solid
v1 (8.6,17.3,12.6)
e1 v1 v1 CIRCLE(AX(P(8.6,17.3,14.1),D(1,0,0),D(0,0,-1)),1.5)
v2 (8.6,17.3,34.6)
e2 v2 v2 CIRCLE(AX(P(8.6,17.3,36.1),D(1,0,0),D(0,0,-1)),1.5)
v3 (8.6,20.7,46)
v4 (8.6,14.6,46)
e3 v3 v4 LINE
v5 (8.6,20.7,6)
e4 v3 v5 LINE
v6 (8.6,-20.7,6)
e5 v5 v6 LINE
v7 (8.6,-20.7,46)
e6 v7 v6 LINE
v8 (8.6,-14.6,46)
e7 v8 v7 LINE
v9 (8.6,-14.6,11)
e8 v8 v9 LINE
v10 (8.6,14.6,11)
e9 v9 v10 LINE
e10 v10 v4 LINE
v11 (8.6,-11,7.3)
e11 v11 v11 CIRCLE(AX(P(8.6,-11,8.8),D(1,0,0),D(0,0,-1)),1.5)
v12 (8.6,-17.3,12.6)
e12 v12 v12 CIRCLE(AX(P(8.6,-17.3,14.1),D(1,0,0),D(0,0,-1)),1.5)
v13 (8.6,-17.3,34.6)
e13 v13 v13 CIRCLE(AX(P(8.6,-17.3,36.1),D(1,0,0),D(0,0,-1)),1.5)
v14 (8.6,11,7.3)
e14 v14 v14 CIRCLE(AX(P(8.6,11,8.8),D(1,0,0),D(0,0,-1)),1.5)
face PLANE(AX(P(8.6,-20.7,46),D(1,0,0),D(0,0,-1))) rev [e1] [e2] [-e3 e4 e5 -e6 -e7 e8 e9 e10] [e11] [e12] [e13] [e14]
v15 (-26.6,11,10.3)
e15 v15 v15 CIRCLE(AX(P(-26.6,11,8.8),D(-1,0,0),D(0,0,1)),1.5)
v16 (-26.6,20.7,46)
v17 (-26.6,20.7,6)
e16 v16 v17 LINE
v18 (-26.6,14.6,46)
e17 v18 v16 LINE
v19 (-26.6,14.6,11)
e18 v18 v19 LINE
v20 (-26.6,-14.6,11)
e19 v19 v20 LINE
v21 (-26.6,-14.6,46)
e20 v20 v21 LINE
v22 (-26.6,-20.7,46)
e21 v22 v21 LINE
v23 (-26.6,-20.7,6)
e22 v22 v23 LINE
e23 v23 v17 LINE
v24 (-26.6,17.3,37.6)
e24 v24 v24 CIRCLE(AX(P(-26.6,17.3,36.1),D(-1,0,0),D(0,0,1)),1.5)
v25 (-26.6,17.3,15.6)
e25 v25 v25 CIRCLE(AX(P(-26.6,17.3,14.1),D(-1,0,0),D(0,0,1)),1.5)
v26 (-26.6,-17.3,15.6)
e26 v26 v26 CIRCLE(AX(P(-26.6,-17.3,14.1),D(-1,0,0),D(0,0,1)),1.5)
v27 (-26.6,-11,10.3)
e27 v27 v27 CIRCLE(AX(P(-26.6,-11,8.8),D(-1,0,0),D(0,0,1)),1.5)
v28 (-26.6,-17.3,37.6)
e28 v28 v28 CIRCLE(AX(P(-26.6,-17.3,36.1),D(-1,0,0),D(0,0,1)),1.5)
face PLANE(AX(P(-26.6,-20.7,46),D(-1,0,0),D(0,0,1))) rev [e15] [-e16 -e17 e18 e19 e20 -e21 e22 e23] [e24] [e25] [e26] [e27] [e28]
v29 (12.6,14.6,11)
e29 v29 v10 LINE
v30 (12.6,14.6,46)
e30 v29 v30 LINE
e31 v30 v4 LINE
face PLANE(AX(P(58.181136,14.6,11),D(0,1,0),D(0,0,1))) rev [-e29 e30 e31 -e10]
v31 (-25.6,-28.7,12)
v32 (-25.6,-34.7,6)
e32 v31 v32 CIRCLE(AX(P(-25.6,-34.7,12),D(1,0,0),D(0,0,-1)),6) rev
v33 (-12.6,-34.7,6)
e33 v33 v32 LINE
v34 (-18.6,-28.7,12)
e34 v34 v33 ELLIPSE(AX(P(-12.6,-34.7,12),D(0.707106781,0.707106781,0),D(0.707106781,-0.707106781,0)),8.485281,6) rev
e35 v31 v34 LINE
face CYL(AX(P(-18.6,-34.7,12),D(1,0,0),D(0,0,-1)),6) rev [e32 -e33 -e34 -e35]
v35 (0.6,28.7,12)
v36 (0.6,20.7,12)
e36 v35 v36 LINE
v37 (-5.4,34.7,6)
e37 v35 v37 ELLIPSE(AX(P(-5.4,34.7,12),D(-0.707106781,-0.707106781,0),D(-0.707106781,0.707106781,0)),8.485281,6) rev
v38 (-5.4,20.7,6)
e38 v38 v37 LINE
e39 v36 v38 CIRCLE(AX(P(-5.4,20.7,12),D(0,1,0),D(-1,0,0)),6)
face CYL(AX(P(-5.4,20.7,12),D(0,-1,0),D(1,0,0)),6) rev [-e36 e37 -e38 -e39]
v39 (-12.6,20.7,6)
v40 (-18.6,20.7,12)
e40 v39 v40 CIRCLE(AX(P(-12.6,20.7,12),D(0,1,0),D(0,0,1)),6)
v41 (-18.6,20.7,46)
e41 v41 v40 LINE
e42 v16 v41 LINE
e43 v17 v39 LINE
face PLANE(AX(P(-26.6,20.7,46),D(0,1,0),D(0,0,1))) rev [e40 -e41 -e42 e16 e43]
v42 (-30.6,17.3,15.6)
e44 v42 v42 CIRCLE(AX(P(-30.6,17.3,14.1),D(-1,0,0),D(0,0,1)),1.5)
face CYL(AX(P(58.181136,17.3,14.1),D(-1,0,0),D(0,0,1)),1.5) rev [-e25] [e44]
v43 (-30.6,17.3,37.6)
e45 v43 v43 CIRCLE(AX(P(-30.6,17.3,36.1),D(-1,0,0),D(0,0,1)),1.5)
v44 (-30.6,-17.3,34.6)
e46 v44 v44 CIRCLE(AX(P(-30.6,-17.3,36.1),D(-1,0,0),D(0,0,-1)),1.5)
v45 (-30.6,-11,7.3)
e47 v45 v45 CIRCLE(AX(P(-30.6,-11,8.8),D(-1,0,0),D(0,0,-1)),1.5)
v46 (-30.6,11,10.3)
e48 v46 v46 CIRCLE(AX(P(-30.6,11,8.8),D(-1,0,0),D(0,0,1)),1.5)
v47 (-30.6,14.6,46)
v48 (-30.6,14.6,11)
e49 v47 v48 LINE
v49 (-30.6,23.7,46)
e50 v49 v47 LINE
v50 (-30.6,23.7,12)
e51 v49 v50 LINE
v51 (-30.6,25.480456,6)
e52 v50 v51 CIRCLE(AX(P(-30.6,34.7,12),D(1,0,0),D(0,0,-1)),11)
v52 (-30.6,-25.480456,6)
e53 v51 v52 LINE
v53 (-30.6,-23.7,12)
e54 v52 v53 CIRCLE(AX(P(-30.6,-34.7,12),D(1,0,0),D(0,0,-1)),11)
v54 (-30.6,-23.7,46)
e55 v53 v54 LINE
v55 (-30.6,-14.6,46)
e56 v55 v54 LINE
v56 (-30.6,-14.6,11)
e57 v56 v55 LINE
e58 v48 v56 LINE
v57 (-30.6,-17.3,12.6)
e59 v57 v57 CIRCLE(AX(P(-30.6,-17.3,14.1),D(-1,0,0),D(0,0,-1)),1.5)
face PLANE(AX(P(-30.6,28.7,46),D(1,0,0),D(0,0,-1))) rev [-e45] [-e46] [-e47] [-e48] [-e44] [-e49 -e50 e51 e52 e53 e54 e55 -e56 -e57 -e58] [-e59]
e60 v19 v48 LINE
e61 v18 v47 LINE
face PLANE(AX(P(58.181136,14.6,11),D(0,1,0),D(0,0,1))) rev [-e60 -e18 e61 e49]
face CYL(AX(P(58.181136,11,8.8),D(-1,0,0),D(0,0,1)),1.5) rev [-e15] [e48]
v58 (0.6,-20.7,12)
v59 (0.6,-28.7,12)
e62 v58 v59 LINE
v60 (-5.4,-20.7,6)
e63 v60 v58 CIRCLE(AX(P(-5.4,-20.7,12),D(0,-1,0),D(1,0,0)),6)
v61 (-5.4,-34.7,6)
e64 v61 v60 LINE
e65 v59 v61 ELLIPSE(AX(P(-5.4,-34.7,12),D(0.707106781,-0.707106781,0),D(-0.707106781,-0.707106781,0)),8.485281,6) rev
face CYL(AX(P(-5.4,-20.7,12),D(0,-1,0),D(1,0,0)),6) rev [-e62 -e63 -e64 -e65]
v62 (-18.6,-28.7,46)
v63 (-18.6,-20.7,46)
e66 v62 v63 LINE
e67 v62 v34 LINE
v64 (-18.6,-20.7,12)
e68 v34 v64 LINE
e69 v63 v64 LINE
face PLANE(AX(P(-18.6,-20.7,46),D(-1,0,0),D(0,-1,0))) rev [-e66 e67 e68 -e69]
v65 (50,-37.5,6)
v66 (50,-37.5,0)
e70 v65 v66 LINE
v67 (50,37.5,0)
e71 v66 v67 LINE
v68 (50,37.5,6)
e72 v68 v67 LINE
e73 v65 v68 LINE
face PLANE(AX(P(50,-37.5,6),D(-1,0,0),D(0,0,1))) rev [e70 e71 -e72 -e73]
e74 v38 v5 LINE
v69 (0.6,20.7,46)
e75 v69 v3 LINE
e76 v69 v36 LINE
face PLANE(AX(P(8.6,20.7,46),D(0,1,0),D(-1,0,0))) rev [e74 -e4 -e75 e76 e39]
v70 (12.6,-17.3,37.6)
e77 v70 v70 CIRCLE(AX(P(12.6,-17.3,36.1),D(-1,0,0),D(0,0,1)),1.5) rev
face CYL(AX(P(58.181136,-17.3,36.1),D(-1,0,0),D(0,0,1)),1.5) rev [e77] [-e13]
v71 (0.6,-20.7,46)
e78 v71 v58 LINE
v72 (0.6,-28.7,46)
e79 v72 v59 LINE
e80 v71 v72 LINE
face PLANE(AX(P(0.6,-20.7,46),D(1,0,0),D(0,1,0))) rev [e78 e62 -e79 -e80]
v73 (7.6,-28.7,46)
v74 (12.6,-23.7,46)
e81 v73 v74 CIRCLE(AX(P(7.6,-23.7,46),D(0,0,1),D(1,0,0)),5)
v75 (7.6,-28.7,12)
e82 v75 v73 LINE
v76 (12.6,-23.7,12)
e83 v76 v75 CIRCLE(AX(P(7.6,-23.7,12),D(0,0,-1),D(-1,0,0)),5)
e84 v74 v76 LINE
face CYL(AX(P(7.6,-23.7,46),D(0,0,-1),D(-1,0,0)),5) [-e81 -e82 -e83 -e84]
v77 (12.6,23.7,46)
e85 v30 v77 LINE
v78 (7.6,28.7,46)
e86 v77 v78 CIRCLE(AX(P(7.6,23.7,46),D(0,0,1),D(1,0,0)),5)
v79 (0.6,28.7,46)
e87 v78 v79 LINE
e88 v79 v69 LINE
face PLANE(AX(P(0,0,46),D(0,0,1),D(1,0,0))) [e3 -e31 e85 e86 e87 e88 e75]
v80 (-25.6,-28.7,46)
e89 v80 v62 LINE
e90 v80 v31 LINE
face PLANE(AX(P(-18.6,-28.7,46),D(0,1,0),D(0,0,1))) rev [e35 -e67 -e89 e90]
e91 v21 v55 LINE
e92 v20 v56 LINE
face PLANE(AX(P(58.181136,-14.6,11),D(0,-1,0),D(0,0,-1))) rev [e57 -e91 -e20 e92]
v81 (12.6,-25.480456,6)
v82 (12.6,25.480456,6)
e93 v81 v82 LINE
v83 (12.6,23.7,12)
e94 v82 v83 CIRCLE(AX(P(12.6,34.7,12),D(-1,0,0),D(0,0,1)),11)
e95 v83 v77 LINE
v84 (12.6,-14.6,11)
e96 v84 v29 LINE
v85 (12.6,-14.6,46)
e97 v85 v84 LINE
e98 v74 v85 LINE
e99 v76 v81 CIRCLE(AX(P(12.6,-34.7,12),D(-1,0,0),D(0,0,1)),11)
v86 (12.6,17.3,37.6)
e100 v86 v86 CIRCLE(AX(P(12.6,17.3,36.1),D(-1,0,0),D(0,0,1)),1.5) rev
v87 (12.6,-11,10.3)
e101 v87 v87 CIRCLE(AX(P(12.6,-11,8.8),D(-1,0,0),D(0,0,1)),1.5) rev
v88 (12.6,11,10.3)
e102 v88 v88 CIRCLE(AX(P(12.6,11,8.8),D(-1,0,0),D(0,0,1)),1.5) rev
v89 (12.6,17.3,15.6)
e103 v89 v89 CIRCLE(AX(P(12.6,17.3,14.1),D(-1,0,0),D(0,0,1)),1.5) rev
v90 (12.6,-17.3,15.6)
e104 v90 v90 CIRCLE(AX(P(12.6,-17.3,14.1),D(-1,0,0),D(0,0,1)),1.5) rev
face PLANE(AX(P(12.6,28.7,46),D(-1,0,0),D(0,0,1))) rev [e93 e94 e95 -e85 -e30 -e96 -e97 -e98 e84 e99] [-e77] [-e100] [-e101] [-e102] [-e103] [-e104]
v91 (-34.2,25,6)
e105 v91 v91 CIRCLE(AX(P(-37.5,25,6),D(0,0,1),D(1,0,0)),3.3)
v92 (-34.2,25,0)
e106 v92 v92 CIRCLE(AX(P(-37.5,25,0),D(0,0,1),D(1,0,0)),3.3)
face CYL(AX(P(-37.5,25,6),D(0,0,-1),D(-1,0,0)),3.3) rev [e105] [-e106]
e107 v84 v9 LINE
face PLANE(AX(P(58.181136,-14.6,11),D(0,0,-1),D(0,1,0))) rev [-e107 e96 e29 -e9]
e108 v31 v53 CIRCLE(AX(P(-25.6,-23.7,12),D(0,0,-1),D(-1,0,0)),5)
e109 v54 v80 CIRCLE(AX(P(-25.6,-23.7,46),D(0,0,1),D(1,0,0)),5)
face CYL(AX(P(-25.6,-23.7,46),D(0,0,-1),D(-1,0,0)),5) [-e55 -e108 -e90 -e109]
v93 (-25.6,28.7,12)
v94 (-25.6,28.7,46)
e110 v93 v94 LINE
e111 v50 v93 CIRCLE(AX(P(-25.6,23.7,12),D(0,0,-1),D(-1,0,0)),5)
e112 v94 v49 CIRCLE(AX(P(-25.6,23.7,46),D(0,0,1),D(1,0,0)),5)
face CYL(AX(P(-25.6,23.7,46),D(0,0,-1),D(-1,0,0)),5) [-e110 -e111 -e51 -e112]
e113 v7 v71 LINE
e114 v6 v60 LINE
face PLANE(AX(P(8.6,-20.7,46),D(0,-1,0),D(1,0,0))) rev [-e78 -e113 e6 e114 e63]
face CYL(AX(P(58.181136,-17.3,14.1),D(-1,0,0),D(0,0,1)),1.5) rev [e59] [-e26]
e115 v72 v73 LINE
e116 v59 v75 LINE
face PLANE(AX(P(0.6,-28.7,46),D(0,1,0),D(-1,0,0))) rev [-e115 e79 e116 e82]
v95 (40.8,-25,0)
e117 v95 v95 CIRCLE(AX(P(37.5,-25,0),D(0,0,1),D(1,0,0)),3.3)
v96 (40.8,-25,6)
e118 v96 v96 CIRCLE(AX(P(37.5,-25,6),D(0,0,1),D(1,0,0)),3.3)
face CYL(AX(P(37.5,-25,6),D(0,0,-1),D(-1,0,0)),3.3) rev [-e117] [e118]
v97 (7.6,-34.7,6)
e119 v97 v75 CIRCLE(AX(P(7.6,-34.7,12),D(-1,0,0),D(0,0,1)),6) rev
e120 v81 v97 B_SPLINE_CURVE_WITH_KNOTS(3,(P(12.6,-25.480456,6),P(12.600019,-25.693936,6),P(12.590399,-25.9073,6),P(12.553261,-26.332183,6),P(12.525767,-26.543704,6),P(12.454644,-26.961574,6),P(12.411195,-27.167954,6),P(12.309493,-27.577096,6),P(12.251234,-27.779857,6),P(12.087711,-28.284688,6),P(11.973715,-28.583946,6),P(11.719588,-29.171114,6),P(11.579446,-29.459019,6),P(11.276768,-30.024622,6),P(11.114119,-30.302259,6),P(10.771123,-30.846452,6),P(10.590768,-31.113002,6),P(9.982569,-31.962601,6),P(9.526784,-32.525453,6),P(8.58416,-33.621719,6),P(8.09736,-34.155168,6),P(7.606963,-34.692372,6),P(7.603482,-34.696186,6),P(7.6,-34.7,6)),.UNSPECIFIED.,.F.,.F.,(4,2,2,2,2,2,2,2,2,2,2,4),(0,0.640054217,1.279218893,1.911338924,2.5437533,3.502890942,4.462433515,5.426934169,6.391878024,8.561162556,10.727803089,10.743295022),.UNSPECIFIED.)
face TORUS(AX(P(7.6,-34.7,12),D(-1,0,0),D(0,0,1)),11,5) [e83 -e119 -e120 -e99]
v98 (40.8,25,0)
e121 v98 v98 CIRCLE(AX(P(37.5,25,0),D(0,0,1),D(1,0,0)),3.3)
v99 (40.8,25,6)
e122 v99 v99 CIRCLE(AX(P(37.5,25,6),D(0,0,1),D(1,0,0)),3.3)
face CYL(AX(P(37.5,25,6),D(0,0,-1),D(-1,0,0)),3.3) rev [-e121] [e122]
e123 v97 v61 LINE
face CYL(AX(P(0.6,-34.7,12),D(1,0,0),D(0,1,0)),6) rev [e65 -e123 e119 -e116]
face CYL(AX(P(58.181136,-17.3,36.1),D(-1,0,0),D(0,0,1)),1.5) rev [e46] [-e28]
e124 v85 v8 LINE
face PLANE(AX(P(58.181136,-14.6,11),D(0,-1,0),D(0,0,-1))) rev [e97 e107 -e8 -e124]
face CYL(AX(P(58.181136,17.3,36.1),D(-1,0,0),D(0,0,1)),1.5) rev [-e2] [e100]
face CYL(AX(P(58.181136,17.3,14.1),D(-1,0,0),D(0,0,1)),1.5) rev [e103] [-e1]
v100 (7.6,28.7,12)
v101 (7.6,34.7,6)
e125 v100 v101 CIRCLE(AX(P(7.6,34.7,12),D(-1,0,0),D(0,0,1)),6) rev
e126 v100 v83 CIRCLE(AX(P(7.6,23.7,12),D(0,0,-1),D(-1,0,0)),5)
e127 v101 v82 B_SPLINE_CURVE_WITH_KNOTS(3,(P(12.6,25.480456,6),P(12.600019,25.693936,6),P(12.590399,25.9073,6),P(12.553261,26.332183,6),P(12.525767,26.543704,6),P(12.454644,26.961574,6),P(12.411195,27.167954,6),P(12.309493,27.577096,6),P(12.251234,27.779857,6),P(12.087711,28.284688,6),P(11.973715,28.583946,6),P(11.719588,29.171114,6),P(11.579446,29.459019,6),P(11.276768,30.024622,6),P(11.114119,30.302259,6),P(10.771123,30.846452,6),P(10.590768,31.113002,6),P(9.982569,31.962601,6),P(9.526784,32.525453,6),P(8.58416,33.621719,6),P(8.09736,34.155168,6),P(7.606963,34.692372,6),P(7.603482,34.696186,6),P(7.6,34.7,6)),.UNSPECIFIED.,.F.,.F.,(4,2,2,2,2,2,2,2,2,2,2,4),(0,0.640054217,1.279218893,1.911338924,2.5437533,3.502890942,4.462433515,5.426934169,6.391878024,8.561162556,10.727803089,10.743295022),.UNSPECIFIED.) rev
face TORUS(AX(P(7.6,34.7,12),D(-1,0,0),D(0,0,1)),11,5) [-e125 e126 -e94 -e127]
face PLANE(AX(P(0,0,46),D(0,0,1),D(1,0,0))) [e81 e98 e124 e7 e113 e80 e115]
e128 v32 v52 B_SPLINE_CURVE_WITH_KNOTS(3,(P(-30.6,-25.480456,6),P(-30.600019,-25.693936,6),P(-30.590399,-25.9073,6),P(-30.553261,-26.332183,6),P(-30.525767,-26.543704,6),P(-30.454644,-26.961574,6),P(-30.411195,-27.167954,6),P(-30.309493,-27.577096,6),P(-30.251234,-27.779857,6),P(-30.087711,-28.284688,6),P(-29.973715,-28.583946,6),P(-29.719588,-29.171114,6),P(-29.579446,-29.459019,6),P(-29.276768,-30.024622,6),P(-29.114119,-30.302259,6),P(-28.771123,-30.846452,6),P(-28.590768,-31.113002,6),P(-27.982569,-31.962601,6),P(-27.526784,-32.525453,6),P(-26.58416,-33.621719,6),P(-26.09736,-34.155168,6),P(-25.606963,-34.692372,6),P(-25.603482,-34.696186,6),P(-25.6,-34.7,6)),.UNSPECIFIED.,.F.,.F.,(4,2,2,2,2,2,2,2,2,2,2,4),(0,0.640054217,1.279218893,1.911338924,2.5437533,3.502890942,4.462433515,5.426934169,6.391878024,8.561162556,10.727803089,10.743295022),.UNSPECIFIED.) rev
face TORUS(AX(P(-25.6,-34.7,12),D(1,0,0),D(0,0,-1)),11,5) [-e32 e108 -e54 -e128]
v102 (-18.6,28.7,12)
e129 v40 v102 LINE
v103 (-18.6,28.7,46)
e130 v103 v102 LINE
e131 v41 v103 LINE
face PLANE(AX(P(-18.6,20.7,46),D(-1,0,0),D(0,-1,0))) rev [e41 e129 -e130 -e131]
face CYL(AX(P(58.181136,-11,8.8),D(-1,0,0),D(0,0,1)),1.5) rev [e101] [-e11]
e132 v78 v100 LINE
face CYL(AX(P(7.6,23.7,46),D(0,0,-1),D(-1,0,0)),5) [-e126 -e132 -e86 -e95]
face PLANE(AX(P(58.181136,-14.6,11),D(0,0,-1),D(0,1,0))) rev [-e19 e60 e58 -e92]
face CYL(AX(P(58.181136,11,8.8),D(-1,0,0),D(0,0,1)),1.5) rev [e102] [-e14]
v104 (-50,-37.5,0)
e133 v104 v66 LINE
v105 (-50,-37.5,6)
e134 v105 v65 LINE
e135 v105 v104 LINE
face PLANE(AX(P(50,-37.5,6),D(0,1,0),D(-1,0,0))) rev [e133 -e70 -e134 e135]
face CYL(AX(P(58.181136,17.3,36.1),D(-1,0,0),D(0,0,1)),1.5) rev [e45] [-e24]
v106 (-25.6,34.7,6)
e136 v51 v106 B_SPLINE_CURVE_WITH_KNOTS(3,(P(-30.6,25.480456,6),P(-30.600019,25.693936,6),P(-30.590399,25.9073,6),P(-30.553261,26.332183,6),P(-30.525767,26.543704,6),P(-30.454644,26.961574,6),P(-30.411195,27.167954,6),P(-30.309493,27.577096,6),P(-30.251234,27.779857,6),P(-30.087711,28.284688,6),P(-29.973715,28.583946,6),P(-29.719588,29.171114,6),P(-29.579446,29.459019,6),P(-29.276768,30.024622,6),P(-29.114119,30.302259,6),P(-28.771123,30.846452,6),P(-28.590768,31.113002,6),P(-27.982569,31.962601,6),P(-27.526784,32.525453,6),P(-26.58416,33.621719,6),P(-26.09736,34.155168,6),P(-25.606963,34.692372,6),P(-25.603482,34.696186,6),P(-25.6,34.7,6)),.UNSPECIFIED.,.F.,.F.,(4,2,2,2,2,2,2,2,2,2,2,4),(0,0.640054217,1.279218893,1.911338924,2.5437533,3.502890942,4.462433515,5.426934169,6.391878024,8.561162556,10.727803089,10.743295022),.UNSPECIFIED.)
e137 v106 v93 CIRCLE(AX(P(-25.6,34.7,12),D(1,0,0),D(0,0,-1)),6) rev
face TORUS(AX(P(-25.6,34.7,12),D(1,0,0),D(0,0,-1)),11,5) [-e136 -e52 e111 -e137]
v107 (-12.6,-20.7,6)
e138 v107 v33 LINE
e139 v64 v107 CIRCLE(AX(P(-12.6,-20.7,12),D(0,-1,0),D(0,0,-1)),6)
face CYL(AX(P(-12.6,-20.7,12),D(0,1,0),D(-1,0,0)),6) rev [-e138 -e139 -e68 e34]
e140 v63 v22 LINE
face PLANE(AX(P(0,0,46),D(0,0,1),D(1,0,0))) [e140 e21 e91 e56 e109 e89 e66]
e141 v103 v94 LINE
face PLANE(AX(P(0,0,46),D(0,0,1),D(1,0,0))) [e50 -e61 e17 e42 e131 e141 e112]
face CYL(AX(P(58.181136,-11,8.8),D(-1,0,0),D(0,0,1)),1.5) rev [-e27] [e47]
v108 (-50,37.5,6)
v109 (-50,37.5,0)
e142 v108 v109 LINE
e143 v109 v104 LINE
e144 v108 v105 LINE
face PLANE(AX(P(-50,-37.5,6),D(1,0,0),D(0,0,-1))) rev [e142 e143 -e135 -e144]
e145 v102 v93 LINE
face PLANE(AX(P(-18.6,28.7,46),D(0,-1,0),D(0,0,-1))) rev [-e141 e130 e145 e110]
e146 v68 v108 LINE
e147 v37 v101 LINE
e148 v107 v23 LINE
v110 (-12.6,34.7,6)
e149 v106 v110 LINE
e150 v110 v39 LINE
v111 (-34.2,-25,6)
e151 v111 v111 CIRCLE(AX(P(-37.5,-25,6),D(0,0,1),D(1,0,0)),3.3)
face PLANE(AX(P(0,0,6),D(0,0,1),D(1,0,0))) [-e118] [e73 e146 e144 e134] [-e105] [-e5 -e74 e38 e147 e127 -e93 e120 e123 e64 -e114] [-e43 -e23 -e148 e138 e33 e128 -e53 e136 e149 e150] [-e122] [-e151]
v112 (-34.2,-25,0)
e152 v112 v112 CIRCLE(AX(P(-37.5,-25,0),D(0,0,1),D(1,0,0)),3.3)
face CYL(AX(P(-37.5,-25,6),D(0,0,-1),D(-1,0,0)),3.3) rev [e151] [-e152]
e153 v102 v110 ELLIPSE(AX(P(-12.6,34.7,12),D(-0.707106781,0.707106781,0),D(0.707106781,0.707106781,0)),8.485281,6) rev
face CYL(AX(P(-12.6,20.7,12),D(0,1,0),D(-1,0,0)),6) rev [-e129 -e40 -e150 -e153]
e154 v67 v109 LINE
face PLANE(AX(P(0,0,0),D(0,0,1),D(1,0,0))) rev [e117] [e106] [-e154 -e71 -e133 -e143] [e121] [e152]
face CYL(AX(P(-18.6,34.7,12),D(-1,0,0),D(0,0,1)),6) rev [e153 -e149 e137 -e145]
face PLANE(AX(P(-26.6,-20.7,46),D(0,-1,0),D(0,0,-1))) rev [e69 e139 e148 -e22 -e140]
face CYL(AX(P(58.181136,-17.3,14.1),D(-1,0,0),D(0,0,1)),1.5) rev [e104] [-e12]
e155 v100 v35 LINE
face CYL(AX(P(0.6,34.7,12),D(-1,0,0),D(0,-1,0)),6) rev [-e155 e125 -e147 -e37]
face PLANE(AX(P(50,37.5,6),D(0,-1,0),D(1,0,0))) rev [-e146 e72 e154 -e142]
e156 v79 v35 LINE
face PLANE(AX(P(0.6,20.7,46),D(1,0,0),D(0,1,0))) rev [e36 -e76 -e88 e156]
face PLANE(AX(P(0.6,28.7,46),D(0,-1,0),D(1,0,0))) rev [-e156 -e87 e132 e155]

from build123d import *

# Parameters (mm, degrees)
SKETCH_1_W          = 100
SKETCH_1_H          = 75
SKETCH_1_R          = 3.3
EXTRUDE_1_DEPTH     = 6
EXTRUDE_2_DEPTH     = 40
CUT_EXTRUDE_1_REACH = 102.093
SKETCH_3_R          = 1.5
SKETCH_3_W          = 35
SKETCH_3_H          = 29.2
FILLET_1_R          = 6
FILLET_2_R          = 5


with BuildPart() as part:
    # 스케치1 → 보스-돌출1 (new body)
    with BuildSketch(Plane.XY):
        Rectangle(SKETCH_1_W, SKETCH_1_H)
        with Locations((-37.5, 25)):
            Circle(SKETCH_1_R, mode=Mode.SUBTRACT)
        with Locations((37.5, 25)):
            Circle(SKETCH_1_R, mode=Mode.SUBTRACT)
        with Locations((37.5, -25)):
            Circle(SKETCH_1_R, mode=Mode.SUBTRACT)
        with Locations((-37.5, -25)):
            Circle(SKETCH_1_R, mode=Mode.SUBTRACT)
    extrude(amount=EXTRUDE_1_DEPTH)

    # 스케치2 → 보스-돌출2 (add)
    with BuildSketch(Plane.XY.offset(6)):
        Polygon((-18.6, 20.7), (-18.6, 28.7), (-30.6, 28.7), (-30.6, -28.7), (-18.6, -28.7), (-18.6, -20.7), (-26.6, -20.7), (-26.6, 20.7), align=None)
        Polygon((8.6, -20.7), (0.6, -20.7), (0.6, -28.7), (12.6, -28.7), (12.6, 28.7), (0.6, 28.7), (0.6, 20.7), (8.6, 20.7), align=None)
    extrude(amount=EXTRUDE_2_DEPTH)

    # 컷-돌출1: up to this face of the body (flat: up to its plane)
    cut_extrude_1_end = Plane(part.part.faces().sort_by_distance((12.6, 0, 26))[0])
    # 스케치3 → 컷-돌출1 (cut, up to the picked face)
    with BuildSketch(Plane.ZY.offset(30.6), mode=Mode.PRIVATE) as cut_extrude_1_sk1:
        with Locations((8.8, 11)):
            Circle(SKETCH_3_R)
    cut_extrude_1_tool1 = split(extrude(cut_extrude_1_sk1.sketch, amount=-CUT_EXTRUDE_1_REACH, mode=Mode.PRIVATE), bisect_by=cut_extrude_1_end, keep=Keep.BOTH, mode=Mode.PRIVATE)
    # 스케치3 → 컷-돌출1 (cut, up to the picked face)
    with BuildSketch(Plane.ZY.offset(30.6), mode=Mode.PRIVATE) as cut_extrude_1_sk2:
        with Locations((14.1, 17.3)):
            Circle(SKETCH_3_R)
    cut_extrude_1_tool2 = split(extrude(cut_extrude_1_sk2.sketch, amount=-CUT_EXTRUDE_1_REACH, mode=Mode.PRIVATE), bisect_by=cut_extrude_1_end, keep=Keep.BOTH, mode=Mode.PRIVATE)
    # 스케치3 → 컷-돌출1 (cut, up to the picked face)
    with BuildSketch(Plane.ZY.offset(30.6), mode=Mode.PRIVATE) as cut_extrude_1_sk3:
        with Locations((36.1, 17.3)):
            Circle(SKETCH_3_R)
    cut_extrude_1_tool3 = split(extrude(cut_extrude_1_sk3.sketch, amount=-CUT_EXTRUDE_1_REACH, mode=Mode.PRIVATE), bisect_by=cut_extrude_1_end, keep=Keep.BOTH, mode=Mode.PRIVATE)
    # 스케치3 → 컷-돌출1 (cut, up to the picked face)
    with BuildSketch(Plane.ZY.offset(30.6), mode=Mode.PRIVATE) as cut_extrude_1_sk4:
        with Locations((8.8, -11)):
            Circle(SKETCH_3_R)
    cut_extrude_1_tool4 = split(extrude(cut_extrude_1_sk4.sketch, amount=-CUT_EXTRUDE_1_REACH, mode=Mode.PRIVATE), bisect_by=cut_extrude_1_end, keep=Keep.BOTH, mode=Mode.PRIVATE)
    # 스케치3 → 컷-돌출1 (cut, up to the picked face)
    with BuildSketch(Plane.ZY.offset(30.6), mode=Mode.PRIVATE) as cut_extrude_1_sk5:
        with Locations((14.1, -17.3)):
            Circle(SKETCH_3_R)
    cut_extrude_1_tool5 = split(extrude(cut_extrude_1_sk5.sketch, amount=-CUT_EXTRUDE_1_REACH, mode=Mode.PRIVATE), bisect_by=cut_extrude_1_end, keep=Keep.BOTH, mode=Mode.PRIVATE)
    # 스케치3 → 컷-돌출1 (cut, up to the picked face)
    with BuildSketch(Plane.ZY.offset(30.6), mode=Mode.PRIVATE) as cut_extrude_1_sk6:
        with Locations((36.1, -17.3)):
            Circle(SKETCH_3_R)
    cut_extrude_1_tool6 = split(extrude(cut_extrude_1_sk6.sketch, amount=-CUT_EXTRUDE_1_REACH, mode=Mode.PRIVATE), bisect_by=cut_extrude_1_end, keep=Keep.BOTH, mode=Mode.PRIVATE)
    # 스케치3 → 컷-돌출1 (cut, up to the picked face)
    with BuildSketch(Plane.ZY.offset(30.6), mode=Mode.PRIVATE) as cut_extrude_1_sk7:
        with Locations((28.5, 0)):
            Rectangle(SKETCH_3_W, SKETCH_3_H)
    cut_extrude_1_tool7 = split(extrude(cut_extrude_1_sk7.sketch, amount=-CUT_EXTRUDE_1_REACH, mode=Mode.PRIVATE), bisect_by=cut_extrude_1_end, keep=Keep.BOTH, mode=Mode.PRIVATE)
    add(cut_extrude_1_tool1.solids().sort_by(Axis((-30.6, 11, 8.8), (1, 0, 0)))[0], mode=Mode.SUBTRACT)
    add(cut_extrude_1_tool2.solids().sort_by(Axis((-30.6, 17.3, 14.1), (1, 0, 0)))[0], mode=Mode.SUBTRACT)
    add(cut_extrude_1_tool3.solids().sort_by(Axis((-30.6, 17.3, 36.1), (1, 0, 0)))[0], mode=Mode.SUBTRACT)
    add(cut_extrude_1_tool4.solids().sort_by(Axis((-30.6, -11, 8.8), (1, 0, 0)))[0], mode=Mode.SUBTRACT)
    add(cut_extrude_1_tool5.solids().sort_by(Axis((-30.6, -17.3, 14.1), (1, 0, 0)))[0], mode=Mode.SUBTRACT)
    add(cut_extrude_1_tool6.solids().sort_by(Axis((-30.6, -17.3, 36.1), (1, 0, 0)))[0], mode=Mode.SUBTRACT)
    add(cut_extrude_1_tool7.solids().sort_by(Axis((-30.6, 0, 28.5), (1, 0, 0)))[0], mode=Mode.SUBTRACT)

    # 필렛1
    fillet_1_edges = [part.edges().sort_by_distance(p)[0] for p in [
        (-18.6, 24.7, 6),
        (-24.6, 28.7, 6),
        (-24.6, -28.7, 6),
        (-18.6, -24.7, 6),
        (0.6, -24.7, 6),
        (6.6, -28.7, 6),
        (6.6, 28.7, 6),
        (0.6, 24.7, 6),
    ]]
    fillet(fillet_1_edges, radius=FILLET_1_R)

    # 필렛2
    # the kernel refuses this fillet: 5 mm, written as the material it takes off along each edge
    with BuildSketch(Plane(origin=(-30.6, 34.7, 12), x_dir=(0, 0.8710924829717933, 0.49111901420127907), z_dir=(0, -0.49111901420127907, 0.8710924829717933))) as fillet_2_piece_1_section:
        with BuildLine():
            CenterArc((6 + FILLET_2_R, -FILLET_2_R), FILLET_2_R, 90, 90)
            Line((6, -FILLET_2_R), (6, 0))
            Line((6, 0), (6 + FILLET_2_R, 0))
        make_face()
    fillet_2_piece_1 = revolve(axis=Axis((-30.6, 34.7, 12), (-1, 0, 0)), revolution_arc=209.414157698, mode=Mode.PRIVATE)
    fillet_2_piece_1 = split(fillet_2_piece_1, bisect_by=Plane(origin=(-29.099532235, 30.223820848, 6), z_dir=(0, 0, 1)), keep=Keep.TOP, mode=Mode.PRIVATE)
    add(fillet_2_piece_1, mode=Mode.SUBTRACT)
    with BuildSketch(Plane(origin=(12.6, 34.7, 12), x_dir=(0, 0.8710924829717934, 0.4911190142012785), z_dir=(0, -0.4911190142012785, 0.8710924829717934))) as fillet_2_piece_2_section:
        with BuildLine():
            CenterArc((6 + FILLET_2_R, FILLET_2_R), FILLET_2_R, 180, 90)
            Line((6 + FILLET_2_R, 0), (6, 0))
            Line((6, 0), (6, FILLET_2_R))
        make_face()
    fillet_2_piece_2 = revolve(axis=Axis((12.6, 34.7, 12), (-1, 0, 0)), revolution_arc=209.414157698, mode=Mode.PRIVATE)
    fillet_2_piece_2 = split(fillet_2_piece_2, bisect_by=Plane(origin=(11.099532075, 30.223821009, 6), z_dir=(0, 0, 1)), keep=Keep.TOP, mode=Mode.PRIVATE)
    add(fillet_2_piece_2, mode=Mode.SUBTRACT)
    with BuildSketch(Plane(origin=(12.6, -34.7, 12), x_dir=(0, -0.8710924829717933, 0.49111901420127907), z_dir=(0, 0.49111901420127907, 0.8710924829717933))) as fillet_2_piece_3_section:
        with BuildLine():
            CenterArc((6 + FILLET_2_R, -FILLET_2_R), FILLET_2_R, 90, 90)
            Line((6, -FILLET_2_R), (6, 0))
            Line((6, 0), (6 + FILLET_2_R, 0))
        make_face()
    fillet_2_piece_3 = revolve(axis=Axis((12.6, -34.7, 12), (1, 0, 0)), revolution_arc=209.414157698, mode=Mode.PRIVATE)
    fillet_2_piece_3 = split(fillet_2_piece_3, bisect_by=Plane(origin=(11.099532513, -30.223820921, 6), z_dir=(0, 0, 1)), keep=Keep.TOP, mode=Mode.PRIVATE)
    add(fillet_2_piece_3, mode=Mode.SUBTRACT)
    with BuildSketch(Plane(origin=(-30.6, -34.7, 12), x_dir=(0, -0.8710924829717931, 0.4911190142012795), z_dir=(0, 0.4911190142012795, 0.8710924829717931))) as fillet_2_piece_4_section:
        with BuildLine():
            CenterArc((6 + FILLET_2_R, FILLET_2_R), FILLET_2_R, 180, 90)
            Line((6 + FILLET_2_R, 0), (6, 0))
            Line((6, 0), (6, FILLET_2_R))
        make_face()
    fillet_2_piece_4 = revolve(axis=Axis((-30.6, -34.7, 12), (1, 0, 0)), revolution_arc=209.414157698, mode=Mode.PRIVATE)
    fillet_2_piece_4 = split(fillet_2_piece_4, bisect_by=Plane(origin=(-29.099532146, -30.223820899, 6), z_dir=(0, 0, 1)), keep=Keep.TOP, mode=Mode.PRIVATE)
    add(fillet_2_piece_4, mode=Mode.SUBTRACT)
    with BuildSketch(Plane(origin=(-30.6, 28.7, 12), x_dir=(1, 0, 0), z_dir=(0, 0, 1)), Plane(origin=(12.6, -28.7, 12), x_dir=(-1, 0, 0), z_dir=(0, 0, 1))) as fillet_2_piece_5:
        with BuildLine():
            CenterArc((FILLET_2_R, -FILLET_2_R), FILLET_2_R, 90, 90)
            Line((0, -FILLET_2_R), (0, 0))
            Line((0, 0), (FILLET_2_R, 0))
        make_face()
    extrude(amount=46.5, mode=Mode.SUBTRACT)
    with BuildSketch(Plane(origin=(-30.6, -28.7, 12), x_dir=(1, 0, 0), z_dir=(0, 0, 1)), Plane(origin=(12.6, 28.7, 12), x_dir=(-1, 0, 0), z_dir=(0, 0, 1))) as fillet_2_piece_6:
        with BuildLine():
            CenterArc((FILLET_2_R, FILLET_2_R), FILLET_2_R, 180, 90)
            Line((0, FILLET_2_R), (0, 0))
            Line((0, 0), (FILLET_2_R, 0))
        make_face()
    extrude(amount=46.5, mode=Mode.SUBTRACT)


solid = part.part
